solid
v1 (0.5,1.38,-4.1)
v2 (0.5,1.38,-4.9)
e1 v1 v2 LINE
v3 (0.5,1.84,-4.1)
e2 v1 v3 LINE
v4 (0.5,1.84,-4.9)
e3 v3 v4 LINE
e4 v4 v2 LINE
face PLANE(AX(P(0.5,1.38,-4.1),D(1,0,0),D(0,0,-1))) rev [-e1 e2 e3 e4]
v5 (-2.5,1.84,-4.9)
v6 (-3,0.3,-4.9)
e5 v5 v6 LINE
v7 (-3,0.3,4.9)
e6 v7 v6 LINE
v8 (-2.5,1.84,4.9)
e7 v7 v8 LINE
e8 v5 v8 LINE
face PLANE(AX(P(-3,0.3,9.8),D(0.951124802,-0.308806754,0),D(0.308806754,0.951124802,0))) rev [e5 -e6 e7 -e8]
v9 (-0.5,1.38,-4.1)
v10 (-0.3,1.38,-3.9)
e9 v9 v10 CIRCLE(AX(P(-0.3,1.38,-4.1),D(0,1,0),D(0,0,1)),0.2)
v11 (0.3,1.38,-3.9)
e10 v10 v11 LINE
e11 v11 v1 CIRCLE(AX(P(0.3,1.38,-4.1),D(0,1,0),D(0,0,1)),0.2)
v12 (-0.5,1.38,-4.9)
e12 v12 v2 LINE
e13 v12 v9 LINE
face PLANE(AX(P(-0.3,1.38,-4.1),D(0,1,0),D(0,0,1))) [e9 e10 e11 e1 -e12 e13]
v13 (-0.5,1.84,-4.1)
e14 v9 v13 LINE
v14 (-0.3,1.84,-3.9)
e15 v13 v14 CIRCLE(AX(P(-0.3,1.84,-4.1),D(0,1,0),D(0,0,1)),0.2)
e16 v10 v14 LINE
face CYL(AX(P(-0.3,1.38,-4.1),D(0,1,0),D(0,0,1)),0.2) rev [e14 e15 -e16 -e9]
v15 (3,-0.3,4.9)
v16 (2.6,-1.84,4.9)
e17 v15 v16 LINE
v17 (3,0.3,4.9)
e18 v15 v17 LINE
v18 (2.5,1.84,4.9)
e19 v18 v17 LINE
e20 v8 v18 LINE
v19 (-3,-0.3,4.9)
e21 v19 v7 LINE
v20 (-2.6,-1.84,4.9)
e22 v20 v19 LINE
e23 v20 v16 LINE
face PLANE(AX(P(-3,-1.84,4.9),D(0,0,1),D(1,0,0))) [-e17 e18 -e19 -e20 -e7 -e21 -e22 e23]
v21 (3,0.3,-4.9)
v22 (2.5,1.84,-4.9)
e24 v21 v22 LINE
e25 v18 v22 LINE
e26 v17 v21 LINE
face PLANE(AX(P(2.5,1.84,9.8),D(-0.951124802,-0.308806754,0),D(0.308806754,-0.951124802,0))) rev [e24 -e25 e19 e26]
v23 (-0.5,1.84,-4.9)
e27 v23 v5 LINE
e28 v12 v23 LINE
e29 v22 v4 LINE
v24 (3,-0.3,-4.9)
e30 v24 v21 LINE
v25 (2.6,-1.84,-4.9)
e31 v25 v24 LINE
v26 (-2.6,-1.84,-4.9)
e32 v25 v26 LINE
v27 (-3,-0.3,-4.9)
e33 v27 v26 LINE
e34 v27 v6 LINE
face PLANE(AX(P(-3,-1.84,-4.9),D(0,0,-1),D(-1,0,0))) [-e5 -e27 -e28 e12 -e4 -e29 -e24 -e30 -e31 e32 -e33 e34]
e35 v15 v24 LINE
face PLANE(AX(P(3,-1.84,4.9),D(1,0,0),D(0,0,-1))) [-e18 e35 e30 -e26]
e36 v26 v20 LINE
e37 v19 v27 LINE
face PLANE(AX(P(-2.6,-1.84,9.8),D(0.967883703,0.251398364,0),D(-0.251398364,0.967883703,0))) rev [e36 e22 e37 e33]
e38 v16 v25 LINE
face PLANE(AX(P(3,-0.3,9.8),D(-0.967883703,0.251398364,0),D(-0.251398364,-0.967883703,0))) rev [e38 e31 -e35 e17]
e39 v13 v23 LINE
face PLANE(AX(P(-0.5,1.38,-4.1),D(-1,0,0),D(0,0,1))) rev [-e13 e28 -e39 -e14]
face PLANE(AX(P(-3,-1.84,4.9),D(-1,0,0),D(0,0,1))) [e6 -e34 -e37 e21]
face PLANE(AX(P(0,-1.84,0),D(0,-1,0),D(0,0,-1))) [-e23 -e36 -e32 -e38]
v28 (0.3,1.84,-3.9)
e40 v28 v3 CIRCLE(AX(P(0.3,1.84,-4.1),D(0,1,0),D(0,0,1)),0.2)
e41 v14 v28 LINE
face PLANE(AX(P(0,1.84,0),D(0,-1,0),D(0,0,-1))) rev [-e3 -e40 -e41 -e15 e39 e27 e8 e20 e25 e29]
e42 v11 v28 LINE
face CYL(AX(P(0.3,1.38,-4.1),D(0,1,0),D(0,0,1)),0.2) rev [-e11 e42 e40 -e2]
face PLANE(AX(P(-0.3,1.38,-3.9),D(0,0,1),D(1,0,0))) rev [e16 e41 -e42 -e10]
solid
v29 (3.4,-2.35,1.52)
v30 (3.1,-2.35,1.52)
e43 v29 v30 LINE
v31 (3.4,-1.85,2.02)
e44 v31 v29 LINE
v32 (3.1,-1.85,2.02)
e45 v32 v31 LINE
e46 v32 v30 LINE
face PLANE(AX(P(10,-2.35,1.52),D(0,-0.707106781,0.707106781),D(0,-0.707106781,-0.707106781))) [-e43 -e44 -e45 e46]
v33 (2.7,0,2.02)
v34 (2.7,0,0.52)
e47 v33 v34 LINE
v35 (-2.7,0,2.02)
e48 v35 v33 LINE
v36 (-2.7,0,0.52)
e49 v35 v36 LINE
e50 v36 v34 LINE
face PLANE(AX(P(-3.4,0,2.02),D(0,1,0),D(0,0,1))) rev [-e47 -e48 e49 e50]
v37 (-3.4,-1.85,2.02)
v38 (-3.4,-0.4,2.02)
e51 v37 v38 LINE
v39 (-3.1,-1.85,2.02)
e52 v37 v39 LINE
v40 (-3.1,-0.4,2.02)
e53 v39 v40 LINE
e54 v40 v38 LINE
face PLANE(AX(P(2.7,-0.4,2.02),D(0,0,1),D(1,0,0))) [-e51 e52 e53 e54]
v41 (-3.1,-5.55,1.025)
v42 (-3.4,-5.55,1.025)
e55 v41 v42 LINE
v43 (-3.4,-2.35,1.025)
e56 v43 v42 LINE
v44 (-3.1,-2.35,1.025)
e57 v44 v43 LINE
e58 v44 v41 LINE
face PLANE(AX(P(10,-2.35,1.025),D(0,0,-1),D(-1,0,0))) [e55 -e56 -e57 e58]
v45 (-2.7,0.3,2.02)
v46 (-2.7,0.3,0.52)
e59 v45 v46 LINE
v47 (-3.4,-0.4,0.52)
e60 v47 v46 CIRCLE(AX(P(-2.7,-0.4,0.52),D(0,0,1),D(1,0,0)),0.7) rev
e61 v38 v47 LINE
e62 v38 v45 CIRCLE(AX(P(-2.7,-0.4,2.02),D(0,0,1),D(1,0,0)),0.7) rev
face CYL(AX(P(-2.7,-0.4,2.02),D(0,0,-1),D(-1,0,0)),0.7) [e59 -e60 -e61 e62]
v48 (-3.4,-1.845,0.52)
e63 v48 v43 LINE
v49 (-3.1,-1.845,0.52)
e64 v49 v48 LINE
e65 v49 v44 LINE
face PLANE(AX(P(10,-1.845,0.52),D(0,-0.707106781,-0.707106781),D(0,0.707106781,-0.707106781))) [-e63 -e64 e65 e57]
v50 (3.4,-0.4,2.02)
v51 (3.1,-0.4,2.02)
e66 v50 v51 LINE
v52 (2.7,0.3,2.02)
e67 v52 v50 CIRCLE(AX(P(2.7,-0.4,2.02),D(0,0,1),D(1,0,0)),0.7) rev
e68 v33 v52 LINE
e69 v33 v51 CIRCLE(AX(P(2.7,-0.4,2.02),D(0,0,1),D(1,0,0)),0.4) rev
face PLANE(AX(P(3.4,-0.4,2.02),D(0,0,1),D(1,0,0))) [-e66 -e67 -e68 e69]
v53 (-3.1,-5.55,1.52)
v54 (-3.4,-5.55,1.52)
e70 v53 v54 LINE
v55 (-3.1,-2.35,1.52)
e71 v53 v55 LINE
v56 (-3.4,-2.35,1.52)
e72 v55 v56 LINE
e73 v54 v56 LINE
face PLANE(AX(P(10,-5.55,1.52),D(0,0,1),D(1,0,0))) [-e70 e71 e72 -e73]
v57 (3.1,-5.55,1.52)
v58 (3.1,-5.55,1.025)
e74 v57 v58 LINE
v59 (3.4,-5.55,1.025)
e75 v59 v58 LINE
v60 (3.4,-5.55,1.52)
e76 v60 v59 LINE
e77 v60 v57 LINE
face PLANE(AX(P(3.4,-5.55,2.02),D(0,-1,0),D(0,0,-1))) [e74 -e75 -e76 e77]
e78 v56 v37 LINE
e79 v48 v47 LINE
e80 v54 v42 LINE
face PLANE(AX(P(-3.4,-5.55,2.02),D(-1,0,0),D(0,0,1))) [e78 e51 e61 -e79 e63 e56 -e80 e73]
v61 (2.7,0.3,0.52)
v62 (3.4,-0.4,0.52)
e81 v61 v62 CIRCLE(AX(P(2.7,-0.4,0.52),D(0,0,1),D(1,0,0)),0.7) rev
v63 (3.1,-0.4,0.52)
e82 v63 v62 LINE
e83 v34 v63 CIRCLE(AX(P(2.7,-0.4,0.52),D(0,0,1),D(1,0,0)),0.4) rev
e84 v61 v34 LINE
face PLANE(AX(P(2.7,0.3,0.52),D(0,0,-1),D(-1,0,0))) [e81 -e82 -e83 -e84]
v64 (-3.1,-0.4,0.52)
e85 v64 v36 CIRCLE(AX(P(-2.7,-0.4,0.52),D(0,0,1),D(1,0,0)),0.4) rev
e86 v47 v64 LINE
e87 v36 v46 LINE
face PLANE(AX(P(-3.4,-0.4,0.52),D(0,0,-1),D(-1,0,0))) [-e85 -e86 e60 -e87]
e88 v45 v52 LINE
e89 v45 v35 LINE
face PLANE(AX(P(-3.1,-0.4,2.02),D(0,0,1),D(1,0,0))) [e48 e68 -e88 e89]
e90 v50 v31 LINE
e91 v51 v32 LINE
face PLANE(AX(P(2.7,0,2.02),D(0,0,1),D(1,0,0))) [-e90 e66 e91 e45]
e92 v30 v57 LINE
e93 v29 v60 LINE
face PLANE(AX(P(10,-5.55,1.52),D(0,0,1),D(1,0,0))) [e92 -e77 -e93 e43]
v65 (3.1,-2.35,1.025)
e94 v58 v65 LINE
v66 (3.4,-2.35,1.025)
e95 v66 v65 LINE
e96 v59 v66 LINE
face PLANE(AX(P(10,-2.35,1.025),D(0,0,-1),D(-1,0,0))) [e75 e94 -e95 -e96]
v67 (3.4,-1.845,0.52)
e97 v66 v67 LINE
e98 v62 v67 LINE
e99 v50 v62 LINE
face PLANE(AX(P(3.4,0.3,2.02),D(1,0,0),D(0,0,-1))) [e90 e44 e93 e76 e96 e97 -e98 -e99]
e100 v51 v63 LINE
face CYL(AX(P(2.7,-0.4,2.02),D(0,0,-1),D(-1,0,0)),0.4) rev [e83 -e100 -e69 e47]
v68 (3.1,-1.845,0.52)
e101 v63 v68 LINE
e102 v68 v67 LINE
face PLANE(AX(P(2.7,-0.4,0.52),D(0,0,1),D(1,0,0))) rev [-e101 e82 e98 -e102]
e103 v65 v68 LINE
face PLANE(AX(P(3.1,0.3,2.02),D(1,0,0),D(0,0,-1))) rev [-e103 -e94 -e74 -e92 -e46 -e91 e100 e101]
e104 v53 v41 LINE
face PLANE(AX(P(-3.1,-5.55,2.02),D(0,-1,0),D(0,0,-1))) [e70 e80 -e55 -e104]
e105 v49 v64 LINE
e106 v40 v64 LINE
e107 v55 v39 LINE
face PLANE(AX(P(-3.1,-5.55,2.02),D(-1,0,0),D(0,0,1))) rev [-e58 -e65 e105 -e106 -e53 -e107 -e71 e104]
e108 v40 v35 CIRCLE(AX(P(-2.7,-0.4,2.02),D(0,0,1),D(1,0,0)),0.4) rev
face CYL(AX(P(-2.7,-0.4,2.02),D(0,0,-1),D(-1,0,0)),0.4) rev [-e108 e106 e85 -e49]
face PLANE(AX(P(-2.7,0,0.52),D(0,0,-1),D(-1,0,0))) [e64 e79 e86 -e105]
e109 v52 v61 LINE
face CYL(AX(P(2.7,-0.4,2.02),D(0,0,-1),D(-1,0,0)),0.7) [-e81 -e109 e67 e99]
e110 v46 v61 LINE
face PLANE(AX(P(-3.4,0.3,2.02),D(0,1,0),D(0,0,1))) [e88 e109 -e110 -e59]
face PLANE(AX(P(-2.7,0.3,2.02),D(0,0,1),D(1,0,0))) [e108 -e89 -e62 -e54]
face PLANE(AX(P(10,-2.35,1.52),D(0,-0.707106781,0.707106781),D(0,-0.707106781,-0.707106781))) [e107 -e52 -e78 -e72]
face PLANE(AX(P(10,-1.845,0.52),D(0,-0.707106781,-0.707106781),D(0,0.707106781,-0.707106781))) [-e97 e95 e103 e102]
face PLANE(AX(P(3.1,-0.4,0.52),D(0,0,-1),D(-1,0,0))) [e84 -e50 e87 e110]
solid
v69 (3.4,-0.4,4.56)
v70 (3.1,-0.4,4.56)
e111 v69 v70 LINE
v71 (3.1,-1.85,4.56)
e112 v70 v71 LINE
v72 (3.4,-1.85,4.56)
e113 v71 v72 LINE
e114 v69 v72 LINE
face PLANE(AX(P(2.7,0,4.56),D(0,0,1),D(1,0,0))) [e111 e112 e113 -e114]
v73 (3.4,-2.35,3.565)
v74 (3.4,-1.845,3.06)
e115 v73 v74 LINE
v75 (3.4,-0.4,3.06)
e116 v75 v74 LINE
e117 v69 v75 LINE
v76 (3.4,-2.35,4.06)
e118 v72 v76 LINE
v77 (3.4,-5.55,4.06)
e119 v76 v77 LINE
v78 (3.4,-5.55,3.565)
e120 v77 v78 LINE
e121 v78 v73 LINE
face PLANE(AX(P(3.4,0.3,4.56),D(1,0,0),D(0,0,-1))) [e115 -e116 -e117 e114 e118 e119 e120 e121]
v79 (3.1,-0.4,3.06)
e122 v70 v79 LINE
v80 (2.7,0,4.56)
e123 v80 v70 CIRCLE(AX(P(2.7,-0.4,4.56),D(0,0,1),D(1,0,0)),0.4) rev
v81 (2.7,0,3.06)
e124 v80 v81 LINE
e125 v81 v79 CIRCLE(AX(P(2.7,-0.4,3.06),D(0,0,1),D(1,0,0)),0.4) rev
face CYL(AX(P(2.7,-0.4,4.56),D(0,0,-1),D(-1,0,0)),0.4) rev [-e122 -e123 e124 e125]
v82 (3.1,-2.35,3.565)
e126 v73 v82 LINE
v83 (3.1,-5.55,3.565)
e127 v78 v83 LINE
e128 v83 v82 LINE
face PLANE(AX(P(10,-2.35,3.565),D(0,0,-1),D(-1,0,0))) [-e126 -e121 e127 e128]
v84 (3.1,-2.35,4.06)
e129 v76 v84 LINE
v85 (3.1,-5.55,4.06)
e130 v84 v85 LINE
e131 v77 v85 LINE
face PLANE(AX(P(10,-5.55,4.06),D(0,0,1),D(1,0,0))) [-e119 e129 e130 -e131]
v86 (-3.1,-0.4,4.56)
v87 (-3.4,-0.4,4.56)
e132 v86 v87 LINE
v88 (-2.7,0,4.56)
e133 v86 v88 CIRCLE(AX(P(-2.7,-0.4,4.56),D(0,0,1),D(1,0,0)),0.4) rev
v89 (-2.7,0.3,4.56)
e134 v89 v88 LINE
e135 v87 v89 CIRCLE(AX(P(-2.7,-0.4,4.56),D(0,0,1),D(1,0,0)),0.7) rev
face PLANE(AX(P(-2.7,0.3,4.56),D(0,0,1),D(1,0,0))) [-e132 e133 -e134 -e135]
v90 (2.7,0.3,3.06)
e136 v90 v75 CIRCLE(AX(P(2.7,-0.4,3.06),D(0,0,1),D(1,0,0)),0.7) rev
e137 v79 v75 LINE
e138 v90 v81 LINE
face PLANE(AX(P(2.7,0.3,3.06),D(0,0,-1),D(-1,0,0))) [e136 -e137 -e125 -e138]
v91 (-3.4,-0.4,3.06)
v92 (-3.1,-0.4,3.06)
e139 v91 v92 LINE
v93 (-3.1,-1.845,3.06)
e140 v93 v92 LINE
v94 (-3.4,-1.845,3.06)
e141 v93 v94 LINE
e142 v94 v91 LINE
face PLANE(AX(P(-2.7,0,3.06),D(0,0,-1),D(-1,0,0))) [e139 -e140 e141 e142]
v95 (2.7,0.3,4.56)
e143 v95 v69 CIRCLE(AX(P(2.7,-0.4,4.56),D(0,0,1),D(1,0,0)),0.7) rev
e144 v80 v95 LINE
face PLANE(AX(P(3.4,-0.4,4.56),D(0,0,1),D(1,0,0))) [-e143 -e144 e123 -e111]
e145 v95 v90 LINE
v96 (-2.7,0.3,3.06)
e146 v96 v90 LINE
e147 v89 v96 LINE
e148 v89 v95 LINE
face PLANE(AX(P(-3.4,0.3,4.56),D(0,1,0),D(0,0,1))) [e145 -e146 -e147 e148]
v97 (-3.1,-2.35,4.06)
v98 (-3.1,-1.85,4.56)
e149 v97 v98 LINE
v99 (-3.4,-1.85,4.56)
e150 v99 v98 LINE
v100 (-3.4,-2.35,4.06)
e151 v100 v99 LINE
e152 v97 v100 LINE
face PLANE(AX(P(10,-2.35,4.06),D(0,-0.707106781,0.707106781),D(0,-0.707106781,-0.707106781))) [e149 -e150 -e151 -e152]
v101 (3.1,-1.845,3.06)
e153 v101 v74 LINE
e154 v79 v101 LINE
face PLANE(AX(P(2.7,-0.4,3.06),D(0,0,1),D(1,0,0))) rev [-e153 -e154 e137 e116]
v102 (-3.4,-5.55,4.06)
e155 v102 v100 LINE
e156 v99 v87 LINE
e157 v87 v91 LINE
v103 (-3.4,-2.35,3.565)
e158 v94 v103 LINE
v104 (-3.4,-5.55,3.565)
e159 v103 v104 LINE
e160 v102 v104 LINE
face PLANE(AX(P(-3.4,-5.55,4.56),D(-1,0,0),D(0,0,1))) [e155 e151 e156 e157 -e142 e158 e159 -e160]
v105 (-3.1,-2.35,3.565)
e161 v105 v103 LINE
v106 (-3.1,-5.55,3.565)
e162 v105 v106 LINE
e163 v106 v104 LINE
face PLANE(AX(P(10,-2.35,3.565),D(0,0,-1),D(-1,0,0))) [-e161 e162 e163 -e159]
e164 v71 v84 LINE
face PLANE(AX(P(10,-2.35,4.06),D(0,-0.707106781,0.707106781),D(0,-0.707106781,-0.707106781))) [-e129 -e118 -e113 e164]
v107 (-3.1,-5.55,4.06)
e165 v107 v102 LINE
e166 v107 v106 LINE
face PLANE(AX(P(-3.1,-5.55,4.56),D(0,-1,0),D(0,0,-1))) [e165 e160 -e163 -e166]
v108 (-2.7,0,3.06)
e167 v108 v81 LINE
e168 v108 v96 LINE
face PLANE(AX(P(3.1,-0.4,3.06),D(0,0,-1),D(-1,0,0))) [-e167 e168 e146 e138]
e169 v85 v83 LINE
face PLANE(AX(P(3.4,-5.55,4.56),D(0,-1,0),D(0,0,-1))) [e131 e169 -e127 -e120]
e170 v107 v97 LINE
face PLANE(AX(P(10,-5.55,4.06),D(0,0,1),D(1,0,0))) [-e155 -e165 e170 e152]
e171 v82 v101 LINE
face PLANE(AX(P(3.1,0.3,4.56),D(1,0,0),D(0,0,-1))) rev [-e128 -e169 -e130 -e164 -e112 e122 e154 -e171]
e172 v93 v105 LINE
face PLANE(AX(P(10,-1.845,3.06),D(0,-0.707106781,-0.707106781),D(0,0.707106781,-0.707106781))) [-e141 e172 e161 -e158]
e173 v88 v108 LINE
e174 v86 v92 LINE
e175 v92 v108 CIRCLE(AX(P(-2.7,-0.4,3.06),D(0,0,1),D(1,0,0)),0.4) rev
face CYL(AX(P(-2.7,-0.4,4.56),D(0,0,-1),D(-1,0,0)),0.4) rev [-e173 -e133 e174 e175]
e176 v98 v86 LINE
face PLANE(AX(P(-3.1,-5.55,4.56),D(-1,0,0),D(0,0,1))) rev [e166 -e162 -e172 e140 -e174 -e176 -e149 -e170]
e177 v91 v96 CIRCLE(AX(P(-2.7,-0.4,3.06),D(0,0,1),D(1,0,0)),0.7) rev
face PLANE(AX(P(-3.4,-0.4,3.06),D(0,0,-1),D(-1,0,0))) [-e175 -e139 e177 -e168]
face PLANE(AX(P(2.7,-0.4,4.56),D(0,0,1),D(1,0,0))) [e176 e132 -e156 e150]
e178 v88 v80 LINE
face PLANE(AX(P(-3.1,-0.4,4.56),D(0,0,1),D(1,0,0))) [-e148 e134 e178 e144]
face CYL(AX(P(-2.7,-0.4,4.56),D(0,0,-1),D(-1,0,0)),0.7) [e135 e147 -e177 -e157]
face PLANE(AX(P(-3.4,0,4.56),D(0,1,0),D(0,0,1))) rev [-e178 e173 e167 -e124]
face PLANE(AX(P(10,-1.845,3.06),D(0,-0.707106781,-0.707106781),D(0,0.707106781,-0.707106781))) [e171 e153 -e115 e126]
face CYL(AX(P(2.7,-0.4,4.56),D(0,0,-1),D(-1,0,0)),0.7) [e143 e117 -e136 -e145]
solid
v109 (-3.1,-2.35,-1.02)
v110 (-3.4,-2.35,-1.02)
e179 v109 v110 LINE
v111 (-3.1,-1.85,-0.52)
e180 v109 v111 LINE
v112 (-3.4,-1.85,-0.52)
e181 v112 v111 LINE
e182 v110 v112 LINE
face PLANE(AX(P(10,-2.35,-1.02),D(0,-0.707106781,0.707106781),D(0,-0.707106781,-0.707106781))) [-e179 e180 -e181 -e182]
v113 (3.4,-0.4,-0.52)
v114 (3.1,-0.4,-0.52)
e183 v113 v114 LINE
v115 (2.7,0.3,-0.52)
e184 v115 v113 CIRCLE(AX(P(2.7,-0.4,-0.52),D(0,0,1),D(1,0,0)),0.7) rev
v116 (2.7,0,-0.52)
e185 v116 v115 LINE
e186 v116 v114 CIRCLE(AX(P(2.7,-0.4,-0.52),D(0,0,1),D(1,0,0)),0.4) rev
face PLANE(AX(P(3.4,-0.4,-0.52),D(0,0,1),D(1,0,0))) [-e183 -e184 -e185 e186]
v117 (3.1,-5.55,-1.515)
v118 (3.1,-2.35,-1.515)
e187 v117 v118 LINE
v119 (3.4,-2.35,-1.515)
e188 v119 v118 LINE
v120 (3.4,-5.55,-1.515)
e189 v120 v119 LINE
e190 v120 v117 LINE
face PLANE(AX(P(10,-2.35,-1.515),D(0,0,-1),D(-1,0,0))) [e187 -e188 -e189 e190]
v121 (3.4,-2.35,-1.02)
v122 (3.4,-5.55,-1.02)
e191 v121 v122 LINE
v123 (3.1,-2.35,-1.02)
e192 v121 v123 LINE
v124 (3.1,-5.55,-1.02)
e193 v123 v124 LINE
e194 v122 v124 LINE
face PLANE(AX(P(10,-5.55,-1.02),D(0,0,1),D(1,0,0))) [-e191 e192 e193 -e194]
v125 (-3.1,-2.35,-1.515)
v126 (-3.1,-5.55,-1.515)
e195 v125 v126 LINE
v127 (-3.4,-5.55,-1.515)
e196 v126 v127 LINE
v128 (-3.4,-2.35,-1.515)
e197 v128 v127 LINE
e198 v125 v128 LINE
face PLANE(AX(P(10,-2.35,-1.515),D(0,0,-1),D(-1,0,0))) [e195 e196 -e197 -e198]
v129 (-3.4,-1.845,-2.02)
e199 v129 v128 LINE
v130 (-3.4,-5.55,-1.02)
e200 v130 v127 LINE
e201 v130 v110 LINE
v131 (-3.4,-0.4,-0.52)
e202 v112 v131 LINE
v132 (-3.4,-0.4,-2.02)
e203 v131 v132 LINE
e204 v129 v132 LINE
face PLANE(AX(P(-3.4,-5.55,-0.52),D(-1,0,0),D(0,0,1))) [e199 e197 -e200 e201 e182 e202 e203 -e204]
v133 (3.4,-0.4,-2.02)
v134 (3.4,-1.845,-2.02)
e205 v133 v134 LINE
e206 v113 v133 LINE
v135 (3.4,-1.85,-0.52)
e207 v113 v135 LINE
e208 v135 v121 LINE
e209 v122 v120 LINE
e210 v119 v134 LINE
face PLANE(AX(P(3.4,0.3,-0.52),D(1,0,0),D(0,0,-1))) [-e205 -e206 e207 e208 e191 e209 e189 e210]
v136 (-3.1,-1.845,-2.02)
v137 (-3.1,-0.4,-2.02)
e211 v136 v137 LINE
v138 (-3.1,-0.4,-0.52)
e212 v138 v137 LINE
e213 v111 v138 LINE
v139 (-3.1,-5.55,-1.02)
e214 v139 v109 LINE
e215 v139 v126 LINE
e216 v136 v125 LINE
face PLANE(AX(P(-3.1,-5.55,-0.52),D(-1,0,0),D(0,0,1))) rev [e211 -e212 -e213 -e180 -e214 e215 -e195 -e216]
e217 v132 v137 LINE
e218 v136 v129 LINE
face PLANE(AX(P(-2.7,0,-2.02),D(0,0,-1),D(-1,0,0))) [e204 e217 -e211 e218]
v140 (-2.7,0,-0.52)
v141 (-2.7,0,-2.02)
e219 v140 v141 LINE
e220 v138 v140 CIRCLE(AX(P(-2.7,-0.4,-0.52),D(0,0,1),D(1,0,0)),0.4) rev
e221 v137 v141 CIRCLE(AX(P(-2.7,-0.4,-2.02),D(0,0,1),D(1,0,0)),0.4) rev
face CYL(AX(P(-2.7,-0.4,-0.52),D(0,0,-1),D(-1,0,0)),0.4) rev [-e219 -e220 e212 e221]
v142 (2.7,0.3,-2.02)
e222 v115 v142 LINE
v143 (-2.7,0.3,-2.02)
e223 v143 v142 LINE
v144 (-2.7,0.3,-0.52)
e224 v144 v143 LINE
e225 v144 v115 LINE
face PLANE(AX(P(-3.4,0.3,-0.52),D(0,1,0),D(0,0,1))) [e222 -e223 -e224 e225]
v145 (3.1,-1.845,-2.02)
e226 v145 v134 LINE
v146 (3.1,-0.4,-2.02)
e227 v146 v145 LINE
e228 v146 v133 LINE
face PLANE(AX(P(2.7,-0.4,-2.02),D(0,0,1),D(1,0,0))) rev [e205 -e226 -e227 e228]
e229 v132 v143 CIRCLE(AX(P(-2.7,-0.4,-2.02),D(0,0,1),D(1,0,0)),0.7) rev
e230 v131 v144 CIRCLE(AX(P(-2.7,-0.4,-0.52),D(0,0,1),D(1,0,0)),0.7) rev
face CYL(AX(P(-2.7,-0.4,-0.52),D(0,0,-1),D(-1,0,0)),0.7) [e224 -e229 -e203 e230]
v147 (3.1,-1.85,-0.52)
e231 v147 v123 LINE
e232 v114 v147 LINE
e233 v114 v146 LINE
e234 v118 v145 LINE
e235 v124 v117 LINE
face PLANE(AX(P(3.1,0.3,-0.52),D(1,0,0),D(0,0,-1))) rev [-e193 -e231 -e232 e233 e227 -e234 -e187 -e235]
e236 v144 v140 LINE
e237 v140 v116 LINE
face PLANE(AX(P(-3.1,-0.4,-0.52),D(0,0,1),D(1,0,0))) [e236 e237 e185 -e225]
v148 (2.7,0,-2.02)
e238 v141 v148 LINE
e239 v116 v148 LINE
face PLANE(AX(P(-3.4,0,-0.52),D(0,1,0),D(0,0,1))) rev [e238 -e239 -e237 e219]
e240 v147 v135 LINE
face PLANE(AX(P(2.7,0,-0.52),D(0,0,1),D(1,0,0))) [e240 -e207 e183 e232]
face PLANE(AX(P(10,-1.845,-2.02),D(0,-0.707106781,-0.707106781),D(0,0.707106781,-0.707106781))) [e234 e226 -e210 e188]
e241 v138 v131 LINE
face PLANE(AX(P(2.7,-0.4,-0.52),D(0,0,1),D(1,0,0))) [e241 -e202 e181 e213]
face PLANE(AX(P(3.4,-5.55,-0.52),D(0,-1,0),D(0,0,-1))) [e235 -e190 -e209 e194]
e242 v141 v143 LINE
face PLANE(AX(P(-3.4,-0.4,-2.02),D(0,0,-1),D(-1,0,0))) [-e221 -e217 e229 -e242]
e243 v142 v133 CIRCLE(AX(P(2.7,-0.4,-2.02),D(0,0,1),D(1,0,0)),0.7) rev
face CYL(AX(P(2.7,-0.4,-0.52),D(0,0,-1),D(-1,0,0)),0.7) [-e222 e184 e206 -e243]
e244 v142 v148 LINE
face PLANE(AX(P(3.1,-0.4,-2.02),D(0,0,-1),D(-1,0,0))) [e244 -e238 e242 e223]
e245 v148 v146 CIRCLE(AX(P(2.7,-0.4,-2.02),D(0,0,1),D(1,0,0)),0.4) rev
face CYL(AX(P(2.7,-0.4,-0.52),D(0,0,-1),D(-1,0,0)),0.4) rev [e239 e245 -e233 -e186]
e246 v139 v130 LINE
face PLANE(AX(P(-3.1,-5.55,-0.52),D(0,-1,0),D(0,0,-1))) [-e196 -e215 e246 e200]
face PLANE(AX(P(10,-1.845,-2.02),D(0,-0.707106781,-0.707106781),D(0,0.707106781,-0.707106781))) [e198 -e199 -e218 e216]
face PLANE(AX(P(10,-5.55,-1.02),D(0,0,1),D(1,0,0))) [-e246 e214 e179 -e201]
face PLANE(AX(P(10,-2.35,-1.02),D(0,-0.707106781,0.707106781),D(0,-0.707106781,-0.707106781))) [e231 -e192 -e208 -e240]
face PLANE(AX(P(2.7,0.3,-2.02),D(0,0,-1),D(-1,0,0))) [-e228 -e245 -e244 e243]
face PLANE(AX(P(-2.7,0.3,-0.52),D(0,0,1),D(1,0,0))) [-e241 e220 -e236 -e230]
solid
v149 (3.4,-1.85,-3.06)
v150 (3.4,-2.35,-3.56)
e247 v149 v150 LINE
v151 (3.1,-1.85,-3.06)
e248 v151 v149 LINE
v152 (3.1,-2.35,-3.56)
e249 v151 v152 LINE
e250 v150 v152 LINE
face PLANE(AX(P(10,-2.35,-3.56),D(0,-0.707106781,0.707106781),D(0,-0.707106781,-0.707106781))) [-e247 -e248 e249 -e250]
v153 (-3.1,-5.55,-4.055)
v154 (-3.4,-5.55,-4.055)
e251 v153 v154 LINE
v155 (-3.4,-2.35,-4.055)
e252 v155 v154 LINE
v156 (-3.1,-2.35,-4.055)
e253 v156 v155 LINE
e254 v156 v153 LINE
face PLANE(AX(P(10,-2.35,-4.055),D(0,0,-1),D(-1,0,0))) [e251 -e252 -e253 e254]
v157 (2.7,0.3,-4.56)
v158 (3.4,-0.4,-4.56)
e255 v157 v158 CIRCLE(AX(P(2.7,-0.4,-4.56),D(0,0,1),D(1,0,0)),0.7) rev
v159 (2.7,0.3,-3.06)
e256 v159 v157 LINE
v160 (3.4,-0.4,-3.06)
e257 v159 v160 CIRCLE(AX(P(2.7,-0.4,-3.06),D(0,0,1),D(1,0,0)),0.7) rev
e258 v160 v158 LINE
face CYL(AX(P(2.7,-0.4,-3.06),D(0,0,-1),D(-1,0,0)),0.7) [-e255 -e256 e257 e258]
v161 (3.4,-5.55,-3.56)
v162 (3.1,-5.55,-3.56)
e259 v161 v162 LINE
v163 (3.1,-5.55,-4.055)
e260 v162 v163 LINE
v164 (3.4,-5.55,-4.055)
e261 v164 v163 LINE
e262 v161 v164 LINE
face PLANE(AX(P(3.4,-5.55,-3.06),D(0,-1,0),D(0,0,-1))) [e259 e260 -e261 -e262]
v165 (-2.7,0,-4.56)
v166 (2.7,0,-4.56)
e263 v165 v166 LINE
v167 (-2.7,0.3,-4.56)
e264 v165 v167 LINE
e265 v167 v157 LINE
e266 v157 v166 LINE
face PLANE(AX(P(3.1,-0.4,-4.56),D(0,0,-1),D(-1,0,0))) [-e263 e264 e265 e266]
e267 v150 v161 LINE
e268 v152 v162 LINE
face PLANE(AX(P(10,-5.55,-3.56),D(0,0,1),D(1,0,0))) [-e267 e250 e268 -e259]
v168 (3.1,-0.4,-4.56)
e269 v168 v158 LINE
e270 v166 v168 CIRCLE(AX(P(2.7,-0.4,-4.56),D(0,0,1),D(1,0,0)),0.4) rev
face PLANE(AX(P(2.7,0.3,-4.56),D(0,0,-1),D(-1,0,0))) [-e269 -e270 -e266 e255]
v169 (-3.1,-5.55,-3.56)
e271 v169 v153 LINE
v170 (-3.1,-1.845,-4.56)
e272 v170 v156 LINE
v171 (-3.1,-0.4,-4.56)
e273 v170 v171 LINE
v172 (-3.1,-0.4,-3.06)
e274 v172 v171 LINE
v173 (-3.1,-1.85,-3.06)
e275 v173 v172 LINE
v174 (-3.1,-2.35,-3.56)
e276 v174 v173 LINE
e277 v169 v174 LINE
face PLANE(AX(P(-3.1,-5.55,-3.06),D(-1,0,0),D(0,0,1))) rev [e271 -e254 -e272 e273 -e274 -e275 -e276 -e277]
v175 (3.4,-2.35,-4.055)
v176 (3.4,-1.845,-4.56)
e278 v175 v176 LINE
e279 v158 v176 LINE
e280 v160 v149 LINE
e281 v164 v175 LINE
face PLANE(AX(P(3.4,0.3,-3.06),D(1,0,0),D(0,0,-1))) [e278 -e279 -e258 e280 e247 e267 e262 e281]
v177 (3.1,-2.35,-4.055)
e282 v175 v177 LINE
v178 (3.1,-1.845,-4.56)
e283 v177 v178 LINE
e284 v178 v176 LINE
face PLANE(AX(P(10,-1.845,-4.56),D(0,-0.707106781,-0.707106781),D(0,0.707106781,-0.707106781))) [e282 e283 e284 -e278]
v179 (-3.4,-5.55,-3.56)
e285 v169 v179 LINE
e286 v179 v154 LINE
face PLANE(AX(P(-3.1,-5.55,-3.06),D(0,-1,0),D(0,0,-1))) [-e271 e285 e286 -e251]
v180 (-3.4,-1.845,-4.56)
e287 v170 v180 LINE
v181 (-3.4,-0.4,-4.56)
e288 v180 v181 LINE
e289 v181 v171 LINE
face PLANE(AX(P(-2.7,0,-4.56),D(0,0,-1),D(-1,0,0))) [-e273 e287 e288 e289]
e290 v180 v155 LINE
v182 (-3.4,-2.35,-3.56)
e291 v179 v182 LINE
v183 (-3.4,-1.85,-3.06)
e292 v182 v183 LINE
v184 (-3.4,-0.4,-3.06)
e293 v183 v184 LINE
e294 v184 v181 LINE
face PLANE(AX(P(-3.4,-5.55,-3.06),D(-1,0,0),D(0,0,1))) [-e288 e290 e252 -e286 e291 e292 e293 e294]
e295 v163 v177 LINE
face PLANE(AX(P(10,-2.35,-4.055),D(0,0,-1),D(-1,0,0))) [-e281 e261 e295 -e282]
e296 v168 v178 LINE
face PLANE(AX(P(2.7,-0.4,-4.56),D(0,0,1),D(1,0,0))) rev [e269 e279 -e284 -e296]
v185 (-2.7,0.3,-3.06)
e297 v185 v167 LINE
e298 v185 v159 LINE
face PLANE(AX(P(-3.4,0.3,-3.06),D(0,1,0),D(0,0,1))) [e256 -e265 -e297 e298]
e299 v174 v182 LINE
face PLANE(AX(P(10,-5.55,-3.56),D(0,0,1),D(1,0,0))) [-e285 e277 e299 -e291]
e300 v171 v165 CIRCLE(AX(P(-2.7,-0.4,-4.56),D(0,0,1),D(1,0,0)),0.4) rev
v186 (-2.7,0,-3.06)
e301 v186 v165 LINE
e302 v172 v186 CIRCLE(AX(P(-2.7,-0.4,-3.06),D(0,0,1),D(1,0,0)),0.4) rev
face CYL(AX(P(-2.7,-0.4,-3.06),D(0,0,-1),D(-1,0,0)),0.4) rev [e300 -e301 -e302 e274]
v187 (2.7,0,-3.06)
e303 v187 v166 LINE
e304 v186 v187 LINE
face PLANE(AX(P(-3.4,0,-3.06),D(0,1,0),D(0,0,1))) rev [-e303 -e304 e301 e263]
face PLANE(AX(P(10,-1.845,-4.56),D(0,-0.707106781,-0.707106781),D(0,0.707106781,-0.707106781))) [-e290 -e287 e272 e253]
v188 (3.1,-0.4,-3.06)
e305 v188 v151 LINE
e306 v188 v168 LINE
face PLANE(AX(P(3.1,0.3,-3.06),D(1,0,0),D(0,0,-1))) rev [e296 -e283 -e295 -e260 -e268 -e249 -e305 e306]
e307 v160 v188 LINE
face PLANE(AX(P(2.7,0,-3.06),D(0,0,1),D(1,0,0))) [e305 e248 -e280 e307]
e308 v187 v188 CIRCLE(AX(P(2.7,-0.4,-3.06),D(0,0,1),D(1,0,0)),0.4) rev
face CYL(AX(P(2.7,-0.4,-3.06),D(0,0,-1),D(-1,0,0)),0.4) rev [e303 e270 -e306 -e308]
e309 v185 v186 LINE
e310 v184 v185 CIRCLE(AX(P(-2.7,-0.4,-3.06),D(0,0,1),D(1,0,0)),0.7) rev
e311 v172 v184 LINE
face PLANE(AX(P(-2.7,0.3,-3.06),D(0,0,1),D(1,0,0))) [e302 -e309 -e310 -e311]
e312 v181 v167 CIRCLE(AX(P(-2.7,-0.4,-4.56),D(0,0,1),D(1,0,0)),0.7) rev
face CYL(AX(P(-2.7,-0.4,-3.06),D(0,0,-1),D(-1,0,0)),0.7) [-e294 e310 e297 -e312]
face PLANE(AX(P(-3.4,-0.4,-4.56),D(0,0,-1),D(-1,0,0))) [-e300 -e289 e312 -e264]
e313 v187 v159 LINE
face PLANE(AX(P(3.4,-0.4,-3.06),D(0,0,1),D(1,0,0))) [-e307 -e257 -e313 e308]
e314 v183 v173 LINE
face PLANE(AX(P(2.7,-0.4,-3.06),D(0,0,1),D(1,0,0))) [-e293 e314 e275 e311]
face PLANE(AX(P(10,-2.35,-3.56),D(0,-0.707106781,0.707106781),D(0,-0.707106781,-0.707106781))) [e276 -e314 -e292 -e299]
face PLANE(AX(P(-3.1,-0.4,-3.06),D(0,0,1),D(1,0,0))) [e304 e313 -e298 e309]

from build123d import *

# Parameters (mm, degrees)
BODY_FEATURE_DEPTH                    = 1.84
BODY_FEATURE_DEPTH_BACK               = 1.84
SKETCH1_W                             = 6
SKETCH1_H                             = 9.8
BEVEL_FEATURE_DEPTH                   = 9.8
BEVEL_FEATURE_DEPTH_BACK              = 9.8
SIGN_FEATURE_DEPTH                    = 0.46
FIRST_AND_LAST_PIN_FEATURE_DEPTH      = 0.75
FIRST_AND_LAST_PIN_FEATURE_DEPTH_BACK = 0.75
PIN_PROFILE_FEATURE_DEPTH             = 10
PIN_PROFILE_FEATURE_DEPTH_BACK        = 10
OTHER_PINS_FEATURE_COUNT              = 4
OTHER_PINS_FEATURE_PITCH              = 2.54


# Sheet-metal steps are written as plain solids
with BuildPart() as part:
    # Sketch1 → Body Feature (new, two sides: drawn at the far end of the back side and taken through both)
    with BuildSketch(Plane(origin=(0, 0, 0), x_dir=(1, 0, 0), z_dir=(0, 1, 0)).offset(-BODY_FEATURE_DEPTH_BACK)):
        Rectangle(SKETCH1_W, SKETCH1_H)
    extrude(amount=BODY_FEATURE_DEPTH + BODY_FEATURE_DEPTH_BACK)

    # Sketch2 → Bevel Feature (cut, two sides: drawn at the far end of the back side and taken through both)
    with BuildSketch(Plane.XY.offset(-BEVEL_FEATURE_DEPTH_BACK)):
        Polygon((-13, 1.882711437), (-9.767114103, 11.84), (9.767114103, 11.84), (13, 1.882711437), (13, -1.577506206), (10.334417196, -11.84), (-10.334417196, -11.84), (-13, -1.577506206), align=None)
        Polygon((-3, 0.3), (-2.5, 1.84), (2.5, 1.84), (3, 0.3), (3, -0.3), (2.6, -1.84), (-2.6, -1.84), (-3, -0.3), align=None, mode=Mode.SUBTRACT)
    extrude(amount=BEVEL_FEATURE_DEPTH + BEVEL_FEATURE_DEPTH_BACK, mode=Mode.SUBTRACT)

    # Sketch3 → Sign Feature (cut)
    with BuildSketch(Plane(origin=(0, 1.84, 0), x_dir=(1, 0, 0), z_dir=(0, 1, 0))):
        with BuildLine():
            Line((-0.3, 3.9), (0.3, 3.9))
            ThreePointArc((0.3, 3.9), (0.441421356, 3.958578644), (0.5, 4.1))
            Line((0.5, 4.1), (0.5, 5.7))
            ThreePointArc((0.5, 5.7), (0.441421356, 5.841421356), (0.3, 5.9))
            Line((0.3, 5.9), (-0.3, 5.9))
            ThreePointArc((-0.3, 5.9), (-0.441421356, 5.841421356), (-0.5, 5.7))
            Line((-0.5, 5.7), (-0.5, 4.1))
            ThreePointArc((-0.5, 4.1), (-0.441421356, 3.958578644), (-0.3, 3.9))
        make_face()
    extrude(amount=-SIGN_FEATURE_DEPTH, mode=Mode.SUBTRACT)


with BuildPart() as body_2:
    # Sketch4 → First and Last Pin Feature (new, two sides: drawn at the far end of the back side and taken through both)
    with BuildSketch(Plane.XY.offset(-3.81).offset(-FIRST_AND_LAST_PIN_FEATURE_DEPTH_BACK)):
        with BuildLine():
            Line((-3.4, -5.55), (-3.4, -0.4))
            ThreePointArc((-3.4, -0.4), (-3.194974747, 0.094974747), (-2.7, 0.3))
            Line((-2.7, 0.3), (2.7, 0.3))
            ThreePointArc((2.7, 0.3), (3.194974747, 0.094974747), (3.4, -0.4))
            Line((3.4, -0.4), (3.4, -5.55))
            Line((3.4, -5.55), (3.1, -5.55))
            Line((3.1, -5.55), (3.1, -0.4))
            ThreePointArc((3.1, -0.4), (2.982842712, -0.117157288), (2.7, 0))
            Line((2.7, 0), (-2.7, 0))
            ThreePointArc((-2.7, 0), (-2.982842712, -0.117157288), (-3.1, -0.4))
            Line((-3.1, -0.4), (-3.1, -5.55))
            Line((-3.1, -5.55), (-3.4, -5.55))
        make_face()
    extrude(amount=FIRST_AND_LAST_PIN_FEATURE_DEPTH + FIRST_AND_LAST_PIN_FEATURE_DEPTH_BACK)

    # Sketch9 → Pin Profile Feature (cut, two sides: drawn at the far end of the back side and taken through both)
    with BuildSketch(Plane(origin=(0, 0, 0), x_dir=(0, 0, -1), z_dir=(1, 0, 0)).offset(-PIN_PROFILE_FEATURE_DEPTH_BACK)):
        Polygon((3.56, -5.55), (3.56, -2.35), (3.055, -1.845), (3.055, -6.55), (4.56, -6.55), (4.56, -1.845), (4.055, -2.35), (4.055, -5.55), align=None)
    extrude(amount=PIN_PROFILE_FEATURE_DEPTH + PIN_PROFILE_FEATURE_DEPTH_BACK, mode=Mode.SUBTRACT)


with BuildPart() as other_pins_feature_1:
    # Other Pins Feature: pattern copy
    add(body_2.part.moved(Location(Vector(0, 0, 1) * (1 * OTHER_PINS_FEATURE_PITCH))))


with BuildPart() as other_pins_feature_2:
    # Other Pins Feature: pattern copy
    add(body_2.part.moved(Location(Vector(0, 0, 1) * (2 * OTHER_PINS_FEATURE_PITCH))))


with BuildPart() as other_pins_feature_3:
    # Other Pins Feature: pattern copy
    add(body_2.part.moved(Location(Vector(0, 0, 1) * (3 * OTHER_PINS_FEATURE_PITCH))))


solid = Compound([part.part, body_2.part, other_pins_feature_1.part, other_pins_feature_2.part, other_pins_feature_3.part])
